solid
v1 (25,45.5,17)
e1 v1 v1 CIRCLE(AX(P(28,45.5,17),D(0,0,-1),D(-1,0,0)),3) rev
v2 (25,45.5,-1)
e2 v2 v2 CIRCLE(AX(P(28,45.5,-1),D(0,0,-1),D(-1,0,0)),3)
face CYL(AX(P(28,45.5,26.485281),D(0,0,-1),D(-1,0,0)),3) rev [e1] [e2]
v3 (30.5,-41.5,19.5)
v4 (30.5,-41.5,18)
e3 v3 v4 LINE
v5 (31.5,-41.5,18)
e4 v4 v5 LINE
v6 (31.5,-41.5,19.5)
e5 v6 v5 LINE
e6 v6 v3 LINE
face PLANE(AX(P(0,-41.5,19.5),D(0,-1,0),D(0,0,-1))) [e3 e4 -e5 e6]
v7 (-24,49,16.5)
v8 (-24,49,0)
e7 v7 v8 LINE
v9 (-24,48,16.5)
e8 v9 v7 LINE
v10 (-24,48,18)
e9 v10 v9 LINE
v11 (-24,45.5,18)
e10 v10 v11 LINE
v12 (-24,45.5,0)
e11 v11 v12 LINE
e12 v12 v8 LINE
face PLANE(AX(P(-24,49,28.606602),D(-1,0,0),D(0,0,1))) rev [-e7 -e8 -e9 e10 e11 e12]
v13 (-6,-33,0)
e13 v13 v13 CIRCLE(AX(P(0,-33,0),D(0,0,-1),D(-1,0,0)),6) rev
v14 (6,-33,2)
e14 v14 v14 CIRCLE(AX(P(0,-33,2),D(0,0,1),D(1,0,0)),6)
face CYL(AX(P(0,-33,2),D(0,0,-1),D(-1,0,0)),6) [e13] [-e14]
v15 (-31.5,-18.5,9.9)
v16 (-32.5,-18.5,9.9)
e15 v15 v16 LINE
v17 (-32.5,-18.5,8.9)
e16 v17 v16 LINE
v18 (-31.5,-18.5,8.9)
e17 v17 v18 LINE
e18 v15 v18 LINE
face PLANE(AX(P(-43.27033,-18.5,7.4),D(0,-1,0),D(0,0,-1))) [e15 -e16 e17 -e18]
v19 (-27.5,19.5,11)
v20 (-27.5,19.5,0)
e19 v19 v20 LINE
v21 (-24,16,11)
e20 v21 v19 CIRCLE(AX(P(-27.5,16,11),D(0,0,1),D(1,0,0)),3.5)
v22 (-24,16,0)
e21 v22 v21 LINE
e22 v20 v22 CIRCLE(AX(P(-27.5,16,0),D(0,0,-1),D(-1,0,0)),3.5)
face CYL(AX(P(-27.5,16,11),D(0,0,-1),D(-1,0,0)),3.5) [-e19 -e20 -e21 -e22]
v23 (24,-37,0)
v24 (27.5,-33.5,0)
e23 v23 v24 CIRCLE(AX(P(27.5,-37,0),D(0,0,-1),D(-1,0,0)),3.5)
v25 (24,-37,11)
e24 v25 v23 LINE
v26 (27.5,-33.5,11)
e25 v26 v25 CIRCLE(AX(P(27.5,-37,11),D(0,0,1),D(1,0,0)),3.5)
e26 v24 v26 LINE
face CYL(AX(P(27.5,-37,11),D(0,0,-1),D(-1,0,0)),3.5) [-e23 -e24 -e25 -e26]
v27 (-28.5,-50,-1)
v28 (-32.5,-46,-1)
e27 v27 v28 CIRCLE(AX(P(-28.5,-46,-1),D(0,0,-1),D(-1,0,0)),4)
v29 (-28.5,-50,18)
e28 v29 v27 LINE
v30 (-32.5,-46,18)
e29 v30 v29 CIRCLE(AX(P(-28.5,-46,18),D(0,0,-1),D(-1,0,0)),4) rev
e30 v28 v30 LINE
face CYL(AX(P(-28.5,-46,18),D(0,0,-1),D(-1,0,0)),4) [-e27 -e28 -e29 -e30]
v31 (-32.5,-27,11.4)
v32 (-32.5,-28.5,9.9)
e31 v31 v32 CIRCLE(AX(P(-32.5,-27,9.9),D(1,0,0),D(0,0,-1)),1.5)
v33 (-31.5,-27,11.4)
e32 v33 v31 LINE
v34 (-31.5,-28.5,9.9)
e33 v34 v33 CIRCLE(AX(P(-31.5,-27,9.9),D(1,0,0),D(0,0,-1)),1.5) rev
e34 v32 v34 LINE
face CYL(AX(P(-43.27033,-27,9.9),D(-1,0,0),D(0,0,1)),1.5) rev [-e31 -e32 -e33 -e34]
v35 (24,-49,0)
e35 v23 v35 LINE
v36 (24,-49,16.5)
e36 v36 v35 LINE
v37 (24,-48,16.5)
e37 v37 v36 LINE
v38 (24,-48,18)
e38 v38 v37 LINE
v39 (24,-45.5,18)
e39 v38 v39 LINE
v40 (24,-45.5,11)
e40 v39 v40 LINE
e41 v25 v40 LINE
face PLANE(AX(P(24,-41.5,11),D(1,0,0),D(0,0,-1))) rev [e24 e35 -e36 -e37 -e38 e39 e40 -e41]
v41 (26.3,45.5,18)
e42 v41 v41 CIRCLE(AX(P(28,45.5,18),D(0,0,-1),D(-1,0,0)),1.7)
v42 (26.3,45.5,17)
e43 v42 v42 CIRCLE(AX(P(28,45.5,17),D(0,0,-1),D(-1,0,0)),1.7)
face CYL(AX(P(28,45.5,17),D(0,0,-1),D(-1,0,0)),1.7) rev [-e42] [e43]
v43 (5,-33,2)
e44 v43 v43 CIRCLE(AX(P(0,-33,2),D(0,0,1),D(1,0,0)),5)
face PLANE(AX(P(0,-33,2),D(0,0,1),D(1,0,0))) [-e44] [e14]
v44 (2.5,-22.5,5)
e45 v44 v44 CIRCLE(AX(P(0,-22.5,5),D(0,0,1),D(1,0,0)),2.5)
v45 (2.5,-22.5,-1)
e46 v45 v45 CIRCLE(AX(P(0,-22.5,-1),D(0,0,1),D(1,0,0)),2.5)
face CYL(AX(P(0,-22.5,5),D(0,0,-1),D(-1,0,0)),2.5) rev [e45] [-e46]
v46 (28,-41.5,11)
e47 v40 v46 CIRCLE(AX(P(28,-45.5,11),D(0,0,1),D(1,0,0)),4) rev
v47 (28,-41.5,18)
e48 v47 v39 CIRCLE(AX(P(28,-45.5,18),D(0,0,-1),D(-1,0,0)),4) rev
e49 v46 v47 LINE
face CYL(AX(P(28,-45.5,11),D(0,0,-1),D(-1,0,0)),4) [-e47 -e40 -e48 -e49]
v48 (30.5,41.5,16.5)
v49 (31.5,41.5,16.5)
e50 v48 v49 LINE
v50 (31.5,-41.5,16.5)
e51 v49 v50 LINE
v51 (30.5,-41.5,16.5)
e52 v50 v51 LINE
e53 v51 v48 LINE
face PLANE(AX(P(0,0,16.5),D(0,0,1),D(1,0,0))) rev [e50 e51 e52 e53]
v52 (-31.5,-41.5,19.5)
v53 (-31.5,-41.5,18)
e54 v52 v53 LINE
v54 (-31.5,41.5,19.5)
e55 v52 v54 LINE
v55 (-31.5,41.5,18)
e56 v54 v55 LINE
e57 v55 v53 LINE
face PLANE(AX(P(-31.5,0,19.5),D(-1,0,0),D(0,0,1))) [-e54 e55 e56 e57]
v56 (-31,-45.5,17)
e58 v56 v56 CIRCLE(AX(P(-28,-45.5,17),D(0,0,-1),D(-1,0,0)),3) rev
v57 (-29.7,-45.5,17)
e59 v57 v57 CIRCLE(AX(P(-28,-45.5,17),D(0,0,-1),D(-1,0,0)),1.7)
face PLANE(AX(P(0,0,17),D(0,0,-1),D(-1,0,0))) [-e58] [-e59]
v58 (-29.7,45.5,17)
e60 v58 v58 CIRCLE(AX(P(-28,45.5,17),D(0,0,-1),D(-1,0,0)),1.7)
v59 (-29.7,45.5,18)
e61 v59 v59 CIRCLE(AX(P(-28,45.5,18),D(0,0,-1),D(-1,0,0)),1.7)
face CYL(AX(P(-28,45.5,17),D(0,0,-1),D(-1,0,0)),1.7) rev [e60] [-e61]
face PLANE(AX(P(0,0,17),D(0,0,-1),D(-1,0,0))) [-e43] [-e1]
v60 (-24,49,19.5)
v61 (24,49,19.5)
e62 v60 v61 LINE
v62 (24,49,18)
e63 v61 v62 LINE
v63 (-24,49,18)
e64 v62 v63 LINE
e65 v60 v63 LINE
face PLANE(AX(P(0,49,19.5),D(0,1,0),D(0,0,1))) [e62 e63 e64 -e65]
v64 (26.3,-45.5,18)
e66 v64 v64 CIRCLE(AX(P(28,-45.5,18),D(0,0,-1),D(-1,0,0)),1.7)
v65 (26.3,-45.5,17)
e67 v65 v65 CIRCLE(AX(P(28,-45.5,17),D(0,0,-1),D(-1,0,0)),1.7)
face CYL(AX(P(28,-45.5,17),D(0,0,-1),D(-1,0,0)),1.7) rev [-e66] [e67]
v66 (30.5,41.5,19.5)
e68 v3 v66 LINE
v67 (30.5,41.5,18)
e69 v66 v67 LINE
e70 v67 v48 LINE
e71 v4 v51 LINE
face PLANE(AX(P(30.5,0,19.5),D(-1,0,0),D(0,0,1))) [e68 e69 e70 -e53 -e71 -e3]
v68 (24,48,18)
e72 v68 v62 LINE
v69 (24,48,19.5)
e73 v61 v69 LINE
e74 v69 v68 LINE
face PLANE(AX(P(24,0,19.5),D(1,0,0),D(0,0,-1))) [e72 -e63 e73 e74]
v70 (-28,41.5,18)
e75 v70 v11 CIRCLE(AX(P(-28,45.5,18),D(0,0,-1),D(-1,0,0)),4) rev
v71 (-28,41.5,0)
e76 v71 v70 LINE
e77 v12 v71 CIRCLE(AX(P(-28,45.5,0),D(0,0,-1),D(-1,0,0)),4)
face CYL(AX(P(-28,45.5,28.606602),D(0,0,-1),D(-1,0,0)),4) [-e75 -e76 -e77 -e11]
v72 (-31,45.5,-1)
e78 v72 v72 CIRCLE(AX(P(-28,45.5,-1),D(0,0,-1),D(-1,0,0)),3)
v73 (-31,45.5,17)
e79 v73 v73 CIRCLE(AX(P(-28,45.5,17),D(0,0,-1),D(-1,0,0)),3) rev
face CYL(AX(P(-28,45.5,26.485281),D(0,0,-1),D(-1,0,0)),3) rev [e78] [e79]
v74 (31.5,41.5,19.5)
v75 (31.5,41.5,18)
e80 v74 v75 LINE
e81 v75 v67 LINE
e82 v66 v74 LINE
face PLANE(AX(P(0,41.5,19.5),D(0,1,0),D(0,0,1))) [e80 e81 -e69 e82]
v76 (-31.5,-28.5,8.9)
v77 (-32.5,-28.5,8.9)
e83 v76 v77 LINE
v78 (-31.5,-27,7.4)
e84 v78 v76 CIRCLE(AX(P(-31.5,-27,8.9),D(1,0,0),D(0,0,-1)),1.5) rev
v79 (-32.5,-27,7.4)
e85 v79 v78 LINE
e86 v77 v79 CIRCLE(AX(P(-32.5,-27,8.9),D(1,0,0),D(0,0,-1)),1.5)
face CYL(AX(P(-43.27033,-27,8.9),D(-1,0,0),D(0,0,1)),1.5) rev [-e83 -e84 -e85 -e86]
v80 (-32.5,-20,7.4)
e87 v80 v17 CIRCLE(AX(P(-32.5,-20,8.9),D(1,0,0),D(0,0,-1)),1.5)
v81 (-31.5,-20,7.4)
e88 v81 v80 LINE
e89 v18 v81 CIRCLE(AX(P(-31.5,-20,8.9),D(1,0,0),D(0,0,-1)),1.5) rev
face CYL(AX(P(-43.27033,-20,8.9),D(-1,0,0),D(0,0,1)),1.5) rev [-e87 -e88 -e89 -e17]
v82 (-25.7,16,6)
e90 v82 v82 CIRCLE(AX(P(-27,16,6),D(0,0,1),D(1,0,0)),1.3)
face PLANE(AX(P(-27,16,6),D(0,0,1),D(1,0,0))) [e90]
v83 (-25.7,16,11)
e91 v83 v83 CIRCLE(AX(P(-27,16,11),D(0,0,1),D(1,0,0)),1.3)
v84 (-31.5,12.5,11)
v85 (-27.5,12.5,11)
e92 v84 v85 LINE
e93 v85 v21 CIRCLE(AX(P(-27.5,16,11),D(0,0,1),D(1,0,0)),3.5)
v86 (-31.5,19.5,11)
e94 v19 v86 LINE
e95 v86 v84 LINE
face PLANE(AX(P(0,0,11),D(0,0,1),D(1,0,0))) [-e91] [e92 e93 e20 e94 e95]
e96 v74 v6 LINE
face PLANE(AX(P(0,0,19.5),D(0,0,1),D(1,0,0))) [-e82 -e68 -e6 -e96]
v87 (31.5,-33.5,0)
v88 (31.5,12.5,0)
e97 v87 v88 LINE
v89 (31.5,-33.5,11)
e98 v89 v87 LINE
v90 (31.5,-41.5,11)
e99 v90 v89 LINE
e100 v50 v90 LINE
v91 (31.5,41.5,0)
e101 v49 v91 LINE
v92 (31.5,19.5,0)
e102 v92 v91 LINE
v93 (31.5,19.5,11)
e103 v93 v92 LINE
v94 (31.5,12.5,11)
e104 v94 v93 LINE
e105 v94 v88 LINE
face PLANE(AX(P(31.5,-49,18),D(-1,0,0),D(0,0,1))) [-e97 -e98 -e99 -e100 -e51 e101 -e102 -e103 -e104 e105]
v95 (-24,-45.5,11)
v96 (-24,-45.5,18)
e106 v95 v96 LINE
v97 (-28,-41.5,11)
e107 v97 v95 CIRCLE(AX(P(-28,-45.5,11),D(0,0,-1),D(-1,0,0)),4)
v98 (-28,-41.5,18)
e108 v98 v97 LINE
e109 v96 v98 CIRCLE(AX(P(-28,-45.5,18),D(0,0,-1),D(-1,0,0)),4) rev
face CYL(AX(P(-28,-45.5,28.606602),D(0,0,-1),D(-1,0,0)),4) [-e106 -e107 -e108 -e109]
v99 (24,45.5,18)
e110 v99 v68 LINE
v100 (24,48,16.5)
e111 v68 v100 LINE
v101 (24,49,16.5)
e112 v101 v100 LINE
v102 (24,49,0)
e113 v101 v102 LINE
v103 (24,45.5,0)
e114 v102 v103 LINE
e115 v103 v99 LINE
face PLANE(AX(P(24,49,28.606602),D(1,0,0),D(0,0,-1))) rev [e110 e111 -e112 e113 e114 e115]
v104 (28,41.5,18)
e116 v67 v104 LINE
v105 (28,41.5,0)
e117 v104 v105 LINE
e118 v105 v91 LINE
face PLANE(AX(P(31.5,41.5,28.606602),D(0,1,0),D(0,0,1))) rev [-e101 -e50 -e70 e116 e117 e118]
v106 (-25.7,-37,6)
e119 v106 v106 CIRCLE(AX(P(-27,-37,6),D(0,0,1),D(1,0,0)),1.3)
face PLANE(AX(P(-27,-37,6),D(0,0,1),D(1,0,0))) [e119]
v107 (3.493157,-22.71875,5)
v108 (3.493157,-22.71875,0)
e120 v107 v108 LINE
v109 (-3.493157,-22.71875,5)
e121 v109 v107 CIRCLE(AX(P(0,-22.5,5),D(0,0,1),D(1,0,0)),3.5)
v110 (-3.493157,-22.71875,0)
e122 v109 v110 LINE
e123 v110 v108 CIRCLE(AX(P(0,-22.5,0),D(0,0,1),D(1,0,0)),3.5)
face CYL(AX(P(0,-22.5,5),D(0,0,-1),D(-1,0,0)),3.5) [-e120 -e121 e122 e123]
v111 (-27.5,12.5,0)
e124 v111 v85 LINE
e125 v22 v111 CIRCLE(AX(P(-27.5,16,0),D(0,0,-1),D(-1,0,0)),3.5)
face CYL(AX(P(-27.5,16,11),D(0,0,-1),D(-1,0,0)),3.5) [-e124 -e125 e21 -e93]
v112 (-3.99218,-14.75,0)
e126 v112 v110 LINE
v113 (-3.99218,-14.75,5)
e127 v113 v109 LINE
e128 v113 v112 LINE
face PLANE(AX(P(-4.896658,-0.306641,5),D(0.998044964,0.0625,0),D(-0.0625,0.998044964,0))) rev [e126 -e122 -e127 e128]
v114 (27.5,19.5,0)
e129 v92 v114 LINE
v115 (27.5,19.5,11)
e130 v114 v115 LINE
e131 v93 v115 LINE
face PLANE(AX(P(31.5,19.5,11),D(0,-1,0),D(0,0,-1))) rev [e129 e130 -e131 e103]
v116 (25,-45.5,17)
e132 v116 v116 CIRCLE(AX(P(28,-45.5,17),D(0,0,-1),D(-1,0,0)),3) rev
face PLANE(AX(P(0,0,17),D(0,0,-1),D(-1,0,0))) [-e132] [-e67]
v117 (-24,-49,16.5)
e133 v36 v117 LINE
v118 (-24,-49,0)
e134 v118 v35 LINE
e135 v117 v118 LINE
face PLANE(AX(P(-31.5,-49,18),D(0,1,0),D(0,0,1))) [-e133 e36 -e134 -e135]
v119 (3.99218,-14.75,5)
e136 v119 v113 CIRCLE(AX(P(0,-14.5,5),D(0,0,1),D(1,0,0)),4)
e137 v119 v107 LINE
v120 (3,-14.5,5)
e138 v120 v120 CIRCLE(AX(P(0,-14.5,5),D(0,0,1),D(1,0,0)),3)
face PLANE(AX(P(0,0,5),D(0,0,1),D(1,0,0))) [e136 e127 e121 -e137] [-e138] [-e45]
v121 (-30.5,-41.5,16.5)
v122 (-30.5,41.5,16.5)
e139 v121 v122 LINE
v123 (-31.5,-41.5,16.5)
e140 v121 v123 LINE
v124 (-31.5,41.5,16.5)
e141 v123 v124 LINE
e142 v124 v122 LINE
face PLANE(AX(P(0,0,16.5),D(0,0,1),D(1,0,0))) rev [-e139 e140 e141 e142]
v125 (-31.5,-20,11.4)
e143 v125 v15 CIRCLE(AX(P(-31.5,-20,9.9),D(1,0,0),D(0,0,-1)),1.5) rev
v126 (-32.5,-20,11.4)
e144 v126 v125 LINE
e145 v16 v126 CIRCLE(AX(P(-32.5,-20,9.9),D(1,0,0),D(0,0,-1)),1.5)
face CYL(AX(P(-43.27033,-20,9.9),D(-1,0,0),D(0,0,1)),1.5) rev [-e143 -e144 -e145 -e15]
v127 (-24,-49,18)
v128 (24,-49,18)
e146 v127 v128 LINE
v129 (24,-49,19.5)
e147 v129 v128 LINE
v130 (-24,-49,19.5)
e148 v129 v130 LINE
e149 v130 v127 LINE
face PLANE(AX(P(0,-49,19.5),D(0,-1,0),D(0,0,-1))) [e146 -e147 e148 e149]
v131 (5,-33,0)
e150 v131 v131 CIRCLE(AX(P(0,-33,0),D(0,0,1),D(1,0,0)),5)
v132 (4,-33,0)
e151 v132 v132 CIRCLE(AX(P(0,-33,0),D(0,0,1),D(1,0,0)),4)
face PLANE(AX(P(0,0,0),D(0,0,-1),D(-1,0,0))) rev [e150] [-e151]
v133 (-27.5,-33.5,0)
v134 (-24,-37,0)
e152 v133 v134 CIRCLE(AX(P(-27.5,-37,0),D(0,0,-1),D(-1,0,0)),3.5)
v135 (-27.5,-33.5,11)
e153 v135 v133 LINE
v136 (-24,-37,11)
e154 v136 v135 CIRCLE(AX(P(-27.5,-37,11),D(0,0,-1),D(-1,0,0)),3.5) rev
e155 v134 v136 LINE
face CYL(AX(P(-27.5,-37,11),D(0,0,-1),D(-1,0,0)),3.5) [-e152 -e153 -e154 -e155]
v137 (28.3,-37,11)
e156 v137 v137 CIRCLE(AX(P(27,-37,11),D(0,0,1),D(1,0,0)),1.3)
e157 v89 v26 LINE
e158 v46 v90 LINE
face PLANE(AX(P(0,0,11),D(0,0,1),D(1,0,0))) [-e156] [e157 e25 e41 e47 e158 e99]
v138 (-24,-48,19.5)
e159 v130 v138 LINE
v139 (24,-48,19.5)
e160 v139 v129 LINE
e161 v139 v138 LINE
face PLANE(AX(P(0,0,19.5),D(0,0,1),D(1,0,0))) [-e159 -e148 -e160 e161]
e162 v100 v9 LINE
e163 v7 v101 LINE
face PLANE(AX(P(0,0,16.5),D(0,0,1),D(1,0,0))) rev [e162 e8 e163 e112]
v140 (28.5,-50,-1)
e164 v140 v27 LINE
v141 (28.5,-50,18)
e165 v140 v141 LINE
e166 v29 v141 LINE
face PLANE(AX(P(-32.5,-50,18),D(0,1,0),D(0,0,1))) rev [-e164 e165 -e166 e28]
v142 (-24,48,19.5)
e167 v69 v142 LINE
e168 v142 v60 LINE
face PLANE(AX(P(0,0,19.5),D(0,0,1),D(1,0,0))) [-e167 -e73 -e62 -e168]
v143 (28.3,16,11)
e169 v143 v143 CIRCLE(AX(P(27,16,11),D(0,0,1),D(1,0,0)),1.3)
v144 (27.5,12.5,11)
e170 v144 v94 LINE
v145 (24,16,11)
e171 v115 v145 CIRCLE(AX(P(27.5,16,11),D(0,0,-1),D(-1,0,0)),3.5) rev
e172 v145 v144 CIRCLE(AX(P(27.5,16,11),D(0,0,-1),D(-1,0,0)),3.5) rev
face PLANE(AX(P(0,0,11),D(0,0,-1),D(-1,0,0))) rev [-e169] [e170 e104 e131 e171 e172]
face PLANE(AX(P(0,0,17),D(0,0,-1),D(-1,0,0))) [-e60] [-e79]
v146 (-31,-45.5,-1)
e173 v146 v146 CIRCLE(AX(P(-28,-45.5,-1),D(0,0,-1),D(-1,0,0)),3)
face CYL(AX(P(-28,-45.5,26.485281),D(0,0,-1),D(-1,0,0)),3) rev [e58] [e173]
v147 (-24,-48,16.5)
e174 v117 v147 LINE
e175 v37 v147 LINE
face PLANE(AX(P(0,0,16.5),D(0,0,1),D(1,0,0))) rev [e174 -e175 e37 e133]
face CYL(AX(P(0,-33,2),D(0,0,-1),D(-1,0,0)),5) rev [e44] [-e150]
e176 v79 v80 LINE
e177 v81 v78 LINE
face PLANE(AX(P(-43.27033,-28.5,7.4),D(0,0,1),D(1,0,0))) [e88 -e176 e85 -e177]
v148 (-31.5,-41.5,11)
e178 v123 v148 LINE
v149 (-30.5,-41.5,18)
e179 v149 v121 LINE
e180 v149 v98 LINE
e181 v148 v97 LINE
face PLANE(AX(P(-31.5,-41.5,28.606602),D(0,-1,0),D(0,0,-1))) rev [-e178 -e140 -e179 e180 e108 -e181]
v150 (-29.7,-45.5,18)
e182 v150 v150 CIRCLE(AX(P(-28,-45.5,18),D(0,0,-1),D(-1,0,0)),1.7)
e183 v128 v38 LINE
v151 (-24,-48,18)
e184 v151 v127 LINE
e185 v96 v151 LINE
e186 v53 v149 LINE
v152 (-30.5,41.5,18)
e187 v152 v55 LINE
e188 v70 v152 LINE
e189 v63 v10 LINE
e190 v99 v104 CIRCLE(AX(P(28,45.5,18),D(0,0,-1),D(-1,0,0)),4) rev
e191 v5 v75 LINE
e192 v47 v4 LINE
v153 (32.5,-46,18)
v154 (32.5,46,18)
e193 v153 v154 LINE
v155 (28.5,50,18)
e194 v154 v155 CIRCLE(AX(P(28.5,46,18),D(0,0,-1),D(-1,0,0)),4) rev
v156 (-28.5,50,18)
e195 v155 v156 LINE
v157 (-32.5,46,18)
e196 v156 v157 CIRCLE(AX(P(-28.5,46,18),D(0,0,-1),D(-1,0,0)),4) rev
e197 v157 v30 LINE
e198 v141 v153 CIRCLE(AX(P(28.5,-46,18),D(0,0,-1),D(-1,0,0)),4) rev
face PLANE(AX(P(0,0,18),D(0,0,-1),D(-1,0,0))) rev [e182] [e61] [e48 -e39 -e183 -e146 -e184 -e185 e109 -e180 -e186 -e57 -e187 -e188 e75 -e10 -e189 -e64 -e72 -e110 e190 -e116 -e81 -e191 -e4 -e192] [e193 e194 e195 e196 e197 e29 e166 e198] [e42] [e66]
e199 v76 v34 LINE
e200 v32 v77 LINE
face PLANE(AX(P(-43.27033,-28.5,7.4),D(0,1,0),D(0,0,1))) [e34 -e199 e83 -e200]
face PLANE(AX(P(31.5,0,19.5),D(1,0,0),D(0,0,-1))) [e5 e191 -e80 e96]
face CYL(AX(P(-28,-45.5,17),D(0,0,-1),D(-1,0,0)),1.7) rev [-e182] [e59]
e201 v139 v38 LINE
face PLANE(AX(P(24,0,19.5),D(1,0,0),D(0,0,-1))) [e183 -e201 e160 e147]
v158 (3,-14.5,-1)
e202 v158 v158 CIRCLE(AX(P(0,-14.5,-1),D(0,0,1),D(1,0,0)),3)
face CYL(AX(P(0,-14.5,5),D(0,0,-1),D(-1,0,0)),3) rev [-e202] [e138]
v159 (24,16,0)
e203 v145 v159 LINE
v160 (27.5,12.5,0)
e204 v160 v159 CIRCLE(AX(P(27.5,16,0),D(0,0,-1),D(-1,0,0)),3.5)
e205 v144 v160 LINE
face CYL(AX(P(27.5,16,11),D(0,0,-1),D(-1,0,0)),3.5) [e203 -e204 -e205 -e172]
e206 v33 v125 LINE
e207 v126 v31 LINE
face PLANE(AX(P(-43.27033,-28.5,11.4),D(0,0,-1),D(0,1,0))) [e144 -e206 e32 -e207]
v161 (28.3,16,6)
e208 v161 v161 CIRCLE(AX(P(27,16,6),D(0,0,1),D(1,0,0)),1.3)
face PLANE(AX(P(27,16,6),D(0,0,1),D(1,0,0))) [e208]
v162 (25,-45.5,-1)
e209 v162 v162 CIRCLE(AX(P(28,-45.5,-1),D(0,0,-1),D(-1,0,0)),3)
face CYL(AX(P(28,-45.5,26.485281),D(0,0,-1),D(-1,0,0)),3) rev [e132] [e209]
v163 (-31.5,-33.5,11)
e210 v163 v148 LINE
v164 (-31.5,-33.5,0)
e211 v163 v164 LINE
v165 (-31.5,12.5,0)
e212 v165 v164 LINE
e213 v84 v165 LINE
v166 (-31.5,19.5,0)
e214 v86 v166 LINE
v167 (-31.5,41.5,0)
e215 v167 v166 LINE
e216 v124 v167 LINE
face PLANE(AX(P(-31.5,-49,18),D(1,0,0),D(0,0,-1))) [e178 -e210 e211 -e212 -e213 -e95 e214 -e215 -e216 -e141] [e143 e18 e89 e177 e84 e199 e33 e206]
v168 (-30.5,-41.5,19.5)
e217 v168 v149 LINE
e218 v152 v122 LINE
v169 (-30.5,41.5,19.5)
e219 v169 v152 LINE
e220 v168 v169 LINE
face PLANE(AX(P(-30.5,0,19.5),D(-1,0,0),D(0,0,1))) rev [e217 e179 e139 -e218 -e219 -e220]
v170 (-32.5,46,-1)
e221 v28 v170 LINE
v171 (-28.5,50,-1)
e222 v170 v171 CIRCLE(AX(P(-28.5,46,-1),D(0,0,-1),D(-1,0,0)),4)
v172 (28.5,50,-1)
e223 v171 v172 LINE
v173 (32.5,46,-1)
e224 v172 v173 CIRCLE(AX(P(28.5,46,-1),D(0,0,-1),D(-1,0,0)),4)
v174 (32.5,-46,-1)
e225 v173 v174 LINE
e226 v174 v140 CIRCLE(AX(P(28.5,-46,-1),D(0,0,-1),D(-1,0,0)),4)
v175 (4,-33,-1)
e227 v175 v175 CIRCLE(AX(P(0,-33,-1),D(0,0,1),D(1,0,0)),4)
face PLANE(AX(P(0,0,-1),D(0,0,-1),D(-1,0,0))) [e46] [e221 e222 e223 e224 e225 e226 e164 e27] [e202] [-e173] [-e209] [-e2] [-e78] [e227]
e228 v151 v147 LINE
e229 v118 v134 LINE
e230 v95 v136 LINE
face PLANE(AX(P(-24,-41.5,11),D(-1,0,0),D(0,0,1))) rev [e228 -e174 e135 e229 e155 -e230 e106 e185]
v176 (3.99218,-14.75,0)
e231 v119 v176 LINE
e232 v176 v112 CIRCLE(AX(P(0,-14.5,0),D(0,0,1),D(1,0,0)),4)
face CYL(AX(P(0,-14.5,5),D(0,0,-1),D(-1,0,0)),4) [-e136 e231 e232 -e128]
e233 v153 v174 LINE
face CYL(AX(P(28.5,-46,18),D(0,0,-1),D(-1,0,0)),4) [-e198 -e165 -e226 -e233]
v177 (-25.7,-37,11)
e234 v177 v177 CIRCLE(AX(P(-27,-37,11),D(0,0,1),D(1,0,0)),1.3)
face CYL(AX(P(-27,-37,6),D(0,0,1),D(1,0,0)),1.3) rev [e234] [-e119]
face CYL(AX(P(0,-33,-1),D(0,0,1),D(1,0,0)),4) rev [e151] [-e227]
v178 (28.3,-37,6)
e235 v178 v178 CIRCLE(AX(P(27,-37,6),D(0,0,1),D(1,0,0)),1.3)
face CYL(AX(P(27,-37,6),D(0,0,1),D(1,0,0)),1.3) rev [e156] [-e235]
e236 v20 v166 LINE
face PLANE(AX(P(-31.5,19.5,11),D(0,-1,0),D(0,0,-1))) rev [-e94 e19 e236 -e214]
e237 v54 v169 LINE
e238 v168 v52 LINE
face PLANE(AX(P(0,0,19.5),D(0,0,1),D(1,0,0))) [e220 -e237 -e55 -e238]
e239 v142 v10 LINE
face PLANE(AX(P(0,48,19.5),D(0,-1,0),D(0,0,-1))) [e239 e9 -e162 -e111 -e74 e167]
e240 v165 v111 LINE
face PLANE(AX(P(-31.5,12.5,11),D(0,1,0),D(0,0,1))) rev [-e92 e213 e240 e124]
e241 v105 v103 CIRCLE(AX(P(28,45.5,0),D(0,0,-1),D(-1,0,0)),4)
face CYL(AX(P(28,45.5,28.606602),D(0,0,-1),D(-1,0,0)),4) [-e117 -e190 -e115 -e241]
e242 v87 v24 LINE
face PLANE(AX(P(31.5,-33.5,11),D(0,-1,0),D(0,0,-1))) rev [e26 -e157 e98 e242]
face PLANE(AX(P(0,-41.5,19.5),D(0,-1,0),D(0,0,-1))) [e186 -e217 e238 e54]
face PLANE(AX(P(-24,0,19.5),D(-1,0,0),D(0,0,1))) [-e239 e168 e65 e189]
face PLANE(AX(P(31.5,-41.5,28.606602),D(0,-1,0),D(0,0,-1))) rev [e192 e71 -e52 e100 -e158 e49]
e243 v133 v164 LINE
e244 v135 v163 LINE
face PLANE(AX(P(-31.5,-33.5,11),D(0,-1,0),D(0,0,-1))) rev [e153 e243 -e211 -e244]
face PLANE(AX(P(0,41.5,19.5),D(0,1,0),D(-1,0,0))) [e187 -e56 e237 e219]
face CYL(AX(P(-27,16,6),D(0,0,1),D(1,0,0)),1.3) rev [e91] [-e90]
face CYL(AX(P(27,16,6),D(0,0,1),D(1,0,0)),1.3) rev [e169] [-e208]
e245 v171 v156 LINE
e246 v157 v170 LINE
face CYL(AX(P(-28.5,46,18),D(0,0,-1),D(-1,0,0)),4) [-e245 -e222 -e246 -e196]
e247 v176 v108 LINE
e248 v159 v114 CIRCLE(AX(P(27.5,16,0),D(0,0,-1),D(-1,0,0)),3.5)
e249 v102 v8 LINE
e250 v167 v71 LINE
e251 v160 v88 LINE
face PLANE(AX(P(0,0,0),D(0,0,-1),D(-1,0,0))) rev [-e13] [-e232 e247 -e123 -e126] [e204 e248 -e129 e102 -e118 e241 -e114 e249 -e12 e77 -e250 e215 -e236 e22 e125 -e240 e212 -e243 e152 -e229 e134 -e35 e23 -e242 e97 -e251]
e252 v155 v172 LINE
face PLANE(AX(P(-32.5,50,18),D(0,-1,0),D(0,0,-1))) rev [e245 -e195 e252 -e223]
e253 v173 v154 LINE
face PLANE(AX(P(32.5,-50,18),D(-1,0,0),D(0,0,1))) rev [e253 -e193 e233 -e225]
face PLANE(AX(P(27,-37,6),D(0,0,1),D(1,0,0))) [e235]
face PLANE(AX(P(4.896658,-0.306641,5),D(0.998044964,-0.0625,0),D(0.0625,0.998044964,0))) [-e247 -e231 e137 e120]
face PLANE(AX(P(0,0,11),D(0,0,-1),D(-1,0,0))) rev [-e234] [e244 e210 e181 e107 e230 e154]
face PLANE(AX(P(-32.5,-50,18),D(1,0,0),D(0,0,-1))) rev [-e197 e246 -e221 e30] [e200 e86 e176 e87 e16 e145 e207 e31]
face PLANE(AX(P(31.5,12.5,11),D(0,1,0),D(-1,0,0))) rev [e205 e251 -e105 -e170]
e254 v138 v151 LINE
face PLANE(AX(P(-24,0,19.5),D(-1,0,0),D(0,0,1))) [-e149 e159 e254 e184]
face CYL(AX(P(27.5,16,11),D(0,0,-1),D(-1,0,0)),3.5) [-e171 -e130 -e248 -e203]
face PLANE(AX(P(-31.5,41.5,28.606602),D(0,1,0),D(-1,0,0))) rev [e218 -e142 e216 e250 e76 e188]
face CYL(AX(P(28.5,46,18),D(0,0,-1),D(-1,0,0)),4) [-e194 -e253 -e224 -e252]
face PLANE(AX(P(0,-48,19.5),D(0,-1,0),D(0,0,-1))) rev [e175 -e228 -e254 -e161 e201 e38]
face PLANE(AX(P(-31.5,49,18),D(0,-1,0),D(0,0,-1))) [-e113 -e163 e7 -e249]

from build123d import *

# Parameters (mm, degrees)
SKETCH_1_W            = 65
SKETCH_1_H            = 100
SKETCH_1_W_2          = 63
SKETCH_1_H_2          = 98
EXTRUDE_1_DEPTH       = 18
SKETCH_3_W            = 65
SKETCH_3_H            = 100
EXTRUDE_2_DEPTH       = 1
SKETCH_4_W            = 7.5
SKETCH_4_H            = 7
SKETCH_4_H_2          = 8
EXTRUDE_3_DEPTH       = 11
SKETCH_8_W            = 7.5
SKETCH_8_H            = 7.5
EXTRUDE_4_DEPTH       = 18
EXTRUDE_10_DEPTH      = 1.5
EXTRUDE_10_DEPTH_BACK = 1.5
SKETCH_17_W           = 48
SKETCH_17_H           = 1
SKETCH_17_W_2         = 1
SKETCH_17_H_2         = 83
SKETCH_11_R           = 3
CUT_EXTRUDE_2_DEPTH   = 18
HOLE_WIZARD_M31_D     = 3.4
SKETCH_5_R            = 1.3
CUT_EXTRUDE_4_DEPTH   = 5
SKETCH_15_W           = 4
SKETCH_15_H           = 10
CUT_EXTRUDE_3_DEPTH   = 1
FILLET_5_R            = 1.5
FILLET_6_R            = 3.5
FILLET_7_R            = 4
SKETCH_16_R           = 6
SKETCH_16_R_2         = 5
EXTRUDE_6_DEPTH       = 2
SKETCH_10_6_R         = 3
SKETCH_10_6_R_2       = 2.5
EXTRUDE_8_DEPTH       = 5
SKETCH_9_4_R          = 4
SKETCH_9_4_R_2        = 2.5
SKETCH_9_4_R_3        = 3
CUT_EXTRUDE_6_DEPTH   = 63.741533293
FILLET_8_R            = 4


with BuildPart() as part:
    # Эскиз1 → Бобышка-Вытянуть1 (new body)
    with BuildSketch(Plane.XY):
        Rectangle(SKETCH_1_W, SKETCH_1_H)
        Rectangle(SKETCH_1_W_2, SKETCH_1_H_2, mode=Mode.SUBTRACT)
    extrude(amount=EXTRUDE_1_DEPTH)

    # Эскиз3 → Бобышка-Вытянуть2 (add)
    with BuildSketch(Plane(origin=(0, 0, 0), x_dir=(-1, 0, 0), z_dir=(0, 0, -1))):
        Rectangle(SKETCH_3_W, SKETCH_3_H)
    extrude(amount=EXTRUDE_2_DEPTH)

    # Эскиз4 → Бобышка-Вытянуть3 (add)
    with BuildSketch(Plane.XY):
        with Locations((-27.75, 16)):
            Rectangle(SKETCH_4_W, SKETCH_4_H)
        with Locations((27.75, 16)):
            Rectangle(SKETCH_4_W, SKETCH_4_H)
        with Locations((-27.75, -37.5)):
            Rectangle(SKETCH_4_W, SKETCH_4_H_2)
        with Locations((27.75, -37.5)):
            Rectangle(SKETCH_4_W, SKETCH_4_H_2)
    extrude(amount=EXTRUDE_3_DEPTH)

    # Эскиз8 → Бобышка-Вытянуть4 (add)
    with BuildSketch(Plane.XY):
        with Locations((-27.75, 45.25)):
            Rectangle(SKETCH_8_W, SKETCH_8_H)
        with Locations((27.75, 45.25)):
            Rectangle(SKETCH_8_W, SKETCH_8_H)
        with Locations((27.75, -45.25)):
            Rectangle(SKETCH_8_W, SKETCH_8_H)
        with Locations((-27.75, -45.25)):
            Rectangle(SKETCH_8_W, SKETCH_8_H)
    extrude(amount=EXTRUDE_4_DEPTH)

    # Эскиз17 → Бобышка-Вытянуть10 (add, two sides: drawn at the far end of the back side and taken through both)
    with BuildSketch(Plane.XY.offset(18).offset(-EXTRUDE_10_DEPTH_BACK)):
        with Locations((0, 48.5)):
            Rectangle(SKETCH_17_W, SKETCH_17_H)
        with Locations((31, 0)):
            Rectangle(SKETCH_17_W_2, SKETCH_17_H_2)
        with Locations((-31, 0)):
            Rectangle(SKETCH_17_W_2, SKETCH_17_H_2)
        with Locations((0, -48.5)):
            Rectangle(SKETCH_17_W, SKETCH_17_H)
    extrude(amount=EXTRUDE_10_DEPTH + EXTRUDE_10_DEPTH_BACK)

    # Эскиз11 → Вырез-Вытянуть2 (cut)
    with BuildSketch(Plane(origin=(0, 0, -1), x_dir=(-1, 0, 0), z_dir=(0, 0, -1))):
        with Locations((-28, 45.5)):
            Circle(SKETCH_11_R)
        with Locations((28, 45.5)):
            Circle(SKETCH_11_R)
        with Locations((28, -45.5)):
            Circle(SKETCH_11_R)
        with Locations((-28, -45.5)):
            Circle(SKETCH_11_R)
    extrude(amount=-CUT_EXTRUDE_2_DEPTH, mode=Mode.SUBTRACT)

    # Отверстие с зазором M31 (through all)
    with Locations(Plane(origin=(0, 0, 17), x_dir=(-1, 0, 0), z_dir=(0, 0, -1))):
        with Locations((-28, 45.5), (28, 45.5), (28, -45.5), (-28, -45.5)):
            Hole(HOLE_WIZARD_M31_D / 2)

    # Эскиз5 → Вырез-Вытянуть4 (cut)
    with BuildSketch(Plane.XY.offset(11)):
        with Locations((-27, 16)):
            Circle(SKETCH_5_R)
        with Locations((27, 16)):
            Circle(SKETCH_5_R)
        with Locations((-27, -37)):
            Circle(SKETCH_5_R)
        with Locations((27, -37)):
            Circle(SKETCH_5_R)
    extrude(amount=-CUT_EXTRUDE_4_DEPTH, mode=Mode.SUBTRACT)

    # Эскиз15 → Вырез-Вытянуть3 (cut)
    with BuildSketch(Plane.ZY.offset(31.5)):
        with Locations((9.4, -23.5)):
            Rectangle(SKETCH_15_W, SKETCH_15_H)
    extrude(amount=CUT_EXTRUDE_3_DEPTH, mode=Mode.SUBTRACT)

    # Скругление5
    fillet_5_edges = [part.edges().sort_by_distance(p)[0] for p in [
        (-32, -18.5, 11.4),
        (-32, -28.5, 11.4),
        (-32, -28.5, 7.4),
        (-32, -18.5, 7.4),
    ]]
    fillet(fillet_5_edges, radius=FILLET_5_R)

    # Скругление6
    fillet_6_edges = [part.edges().sort_by_distance(p)[0] for p in [
        (-24, 12.5, 5.5),
        (-24, 19.5, 5.5),
        (24, 19.5, 5.5),
        (24, 12.5, 5.5),
        (-24, -33.5, 5.5),
        (24, -33.5, 5.5),
    ]]
    fillet(fillet_6_edges, radius=FILLET_6_R - 0.0001)  # a hair under: the kernel refuses the full size

    # Скругление7
    fillet_7_edges = [part.edges().sort_by_distance(p)[0] for p in [
        (-24, 41.5, 9),
        (24, 41.5, 9),
        (24, -41.5, 14.5),
        (-24, -41.5, 14.5),
    ]]
    fillet(fillet_7_edges, radius=FILLET_7_R)

    # Эскиз16 → Бобышка-Вытянуть6 (add)
    with BuildSketch(Plane.XY):
        with Locations(Location((0, -33, 0), (0, 0, 180))):
            Circle(SKETCH_16_R)
        with Locations((0, -33)):
            Circle(SKETCH_16_R_2, mode=Mode.SUBTRACT)
    extrude(amount=EXTRUDE_6_DEPTH)

    # Эскиз10<6> → Бобышка-Вытянуть8 (add)
    # profile 1 of 3: a face of its own
    with BuildSketch(Plane.XY):
        with BuildLine():
            ThreePointArc((-3.992179856, -14.75), (0, -18.5), (3.992179856, -14.75))
            ThreePointArc((3.992179856, -14.75), (3.998044486, -14.62506114), (4, -14.5))
            ThreePointArc((4, -14.5), (-0.12506114, -10.501955514), (-3.992179856, -14.75))
        make_face()
        with Locations((0, -14.5)):
            Circle(SKETCH_10_6_R, mode=Mode.SUBTRACT)
    # profile 2 of 3: a face of its own
    with BuildSketch(Plane.XY):
        with BuildLine():
            Line((3.493157374, -22.71875), (3.992179856, -14.75))
            ThreePointArc((3.992179856, -14.75), (0, -18.5), (-3.992179856, -14.75))
            Line((-3.992179856, -14.75), (-3.493157374, -22.71875))
            ThreePointArc((-3.493157374, -22.71875), (-0.109428497, -19.001711075), (3.5, -22.5))
            ThreePointArc((3.5, -22.5), (3.498288925, -22.609428497), (3.493157374, -22.71875))
        make_face()
    # profile 3 of 3: a face of its own
    with BuildSketch(Plane.XY):
        with BuildLine():
            ThreePointArc((-3.493157374, -22.71875), (0, -26), (3.493157374, -22.71875))
            ThreePointArc((3.493157374, -22.71875), (3.498288925, -22.609428497), (3.5, -22.5))
            ThreePointArc((3.5, -22.5), (-0.109428497, -19.001711075), (-3.493157374, -22.71875))
        make_face()
        with Locations((0, -22.5)):
            Circle(SKETCH_10_6_R_2, mode=Mode.SUBTRACT)
    extrude(amount=EXTRUDE_8_DEPTH)

    # Эскиз9<4> → Вырез-Вытянуть6 (cut, through all)
    with BuildSketch(Plane.XY):
        with Locations((0, -33)):
            Circle(SKETCH_9_4_R)
        with Locations((0, -22.5)):
            Circle(SKETCH_9_4_R_2)
        with Locations((0, -14.5)):
            Circle(SKETCH_9_4_R_3)
    extrude(amount=-CUT_EXTRUDE_6_DEPTH, mode=Mode.SUBTRACT)

    # Скругление8
    fillet_8_edges = [part.edges().sort_by_distance(p)[0] for p in [
        (32.5, -50, 8.5),
        (-32.5, -50, 8.5),
        (-32.5, 50, 8.5),
        (32.5, 50, 8.5),
    ]]
    fillet(fillet_8_edges, radius=FILLET_8_R)


solid = part.part
